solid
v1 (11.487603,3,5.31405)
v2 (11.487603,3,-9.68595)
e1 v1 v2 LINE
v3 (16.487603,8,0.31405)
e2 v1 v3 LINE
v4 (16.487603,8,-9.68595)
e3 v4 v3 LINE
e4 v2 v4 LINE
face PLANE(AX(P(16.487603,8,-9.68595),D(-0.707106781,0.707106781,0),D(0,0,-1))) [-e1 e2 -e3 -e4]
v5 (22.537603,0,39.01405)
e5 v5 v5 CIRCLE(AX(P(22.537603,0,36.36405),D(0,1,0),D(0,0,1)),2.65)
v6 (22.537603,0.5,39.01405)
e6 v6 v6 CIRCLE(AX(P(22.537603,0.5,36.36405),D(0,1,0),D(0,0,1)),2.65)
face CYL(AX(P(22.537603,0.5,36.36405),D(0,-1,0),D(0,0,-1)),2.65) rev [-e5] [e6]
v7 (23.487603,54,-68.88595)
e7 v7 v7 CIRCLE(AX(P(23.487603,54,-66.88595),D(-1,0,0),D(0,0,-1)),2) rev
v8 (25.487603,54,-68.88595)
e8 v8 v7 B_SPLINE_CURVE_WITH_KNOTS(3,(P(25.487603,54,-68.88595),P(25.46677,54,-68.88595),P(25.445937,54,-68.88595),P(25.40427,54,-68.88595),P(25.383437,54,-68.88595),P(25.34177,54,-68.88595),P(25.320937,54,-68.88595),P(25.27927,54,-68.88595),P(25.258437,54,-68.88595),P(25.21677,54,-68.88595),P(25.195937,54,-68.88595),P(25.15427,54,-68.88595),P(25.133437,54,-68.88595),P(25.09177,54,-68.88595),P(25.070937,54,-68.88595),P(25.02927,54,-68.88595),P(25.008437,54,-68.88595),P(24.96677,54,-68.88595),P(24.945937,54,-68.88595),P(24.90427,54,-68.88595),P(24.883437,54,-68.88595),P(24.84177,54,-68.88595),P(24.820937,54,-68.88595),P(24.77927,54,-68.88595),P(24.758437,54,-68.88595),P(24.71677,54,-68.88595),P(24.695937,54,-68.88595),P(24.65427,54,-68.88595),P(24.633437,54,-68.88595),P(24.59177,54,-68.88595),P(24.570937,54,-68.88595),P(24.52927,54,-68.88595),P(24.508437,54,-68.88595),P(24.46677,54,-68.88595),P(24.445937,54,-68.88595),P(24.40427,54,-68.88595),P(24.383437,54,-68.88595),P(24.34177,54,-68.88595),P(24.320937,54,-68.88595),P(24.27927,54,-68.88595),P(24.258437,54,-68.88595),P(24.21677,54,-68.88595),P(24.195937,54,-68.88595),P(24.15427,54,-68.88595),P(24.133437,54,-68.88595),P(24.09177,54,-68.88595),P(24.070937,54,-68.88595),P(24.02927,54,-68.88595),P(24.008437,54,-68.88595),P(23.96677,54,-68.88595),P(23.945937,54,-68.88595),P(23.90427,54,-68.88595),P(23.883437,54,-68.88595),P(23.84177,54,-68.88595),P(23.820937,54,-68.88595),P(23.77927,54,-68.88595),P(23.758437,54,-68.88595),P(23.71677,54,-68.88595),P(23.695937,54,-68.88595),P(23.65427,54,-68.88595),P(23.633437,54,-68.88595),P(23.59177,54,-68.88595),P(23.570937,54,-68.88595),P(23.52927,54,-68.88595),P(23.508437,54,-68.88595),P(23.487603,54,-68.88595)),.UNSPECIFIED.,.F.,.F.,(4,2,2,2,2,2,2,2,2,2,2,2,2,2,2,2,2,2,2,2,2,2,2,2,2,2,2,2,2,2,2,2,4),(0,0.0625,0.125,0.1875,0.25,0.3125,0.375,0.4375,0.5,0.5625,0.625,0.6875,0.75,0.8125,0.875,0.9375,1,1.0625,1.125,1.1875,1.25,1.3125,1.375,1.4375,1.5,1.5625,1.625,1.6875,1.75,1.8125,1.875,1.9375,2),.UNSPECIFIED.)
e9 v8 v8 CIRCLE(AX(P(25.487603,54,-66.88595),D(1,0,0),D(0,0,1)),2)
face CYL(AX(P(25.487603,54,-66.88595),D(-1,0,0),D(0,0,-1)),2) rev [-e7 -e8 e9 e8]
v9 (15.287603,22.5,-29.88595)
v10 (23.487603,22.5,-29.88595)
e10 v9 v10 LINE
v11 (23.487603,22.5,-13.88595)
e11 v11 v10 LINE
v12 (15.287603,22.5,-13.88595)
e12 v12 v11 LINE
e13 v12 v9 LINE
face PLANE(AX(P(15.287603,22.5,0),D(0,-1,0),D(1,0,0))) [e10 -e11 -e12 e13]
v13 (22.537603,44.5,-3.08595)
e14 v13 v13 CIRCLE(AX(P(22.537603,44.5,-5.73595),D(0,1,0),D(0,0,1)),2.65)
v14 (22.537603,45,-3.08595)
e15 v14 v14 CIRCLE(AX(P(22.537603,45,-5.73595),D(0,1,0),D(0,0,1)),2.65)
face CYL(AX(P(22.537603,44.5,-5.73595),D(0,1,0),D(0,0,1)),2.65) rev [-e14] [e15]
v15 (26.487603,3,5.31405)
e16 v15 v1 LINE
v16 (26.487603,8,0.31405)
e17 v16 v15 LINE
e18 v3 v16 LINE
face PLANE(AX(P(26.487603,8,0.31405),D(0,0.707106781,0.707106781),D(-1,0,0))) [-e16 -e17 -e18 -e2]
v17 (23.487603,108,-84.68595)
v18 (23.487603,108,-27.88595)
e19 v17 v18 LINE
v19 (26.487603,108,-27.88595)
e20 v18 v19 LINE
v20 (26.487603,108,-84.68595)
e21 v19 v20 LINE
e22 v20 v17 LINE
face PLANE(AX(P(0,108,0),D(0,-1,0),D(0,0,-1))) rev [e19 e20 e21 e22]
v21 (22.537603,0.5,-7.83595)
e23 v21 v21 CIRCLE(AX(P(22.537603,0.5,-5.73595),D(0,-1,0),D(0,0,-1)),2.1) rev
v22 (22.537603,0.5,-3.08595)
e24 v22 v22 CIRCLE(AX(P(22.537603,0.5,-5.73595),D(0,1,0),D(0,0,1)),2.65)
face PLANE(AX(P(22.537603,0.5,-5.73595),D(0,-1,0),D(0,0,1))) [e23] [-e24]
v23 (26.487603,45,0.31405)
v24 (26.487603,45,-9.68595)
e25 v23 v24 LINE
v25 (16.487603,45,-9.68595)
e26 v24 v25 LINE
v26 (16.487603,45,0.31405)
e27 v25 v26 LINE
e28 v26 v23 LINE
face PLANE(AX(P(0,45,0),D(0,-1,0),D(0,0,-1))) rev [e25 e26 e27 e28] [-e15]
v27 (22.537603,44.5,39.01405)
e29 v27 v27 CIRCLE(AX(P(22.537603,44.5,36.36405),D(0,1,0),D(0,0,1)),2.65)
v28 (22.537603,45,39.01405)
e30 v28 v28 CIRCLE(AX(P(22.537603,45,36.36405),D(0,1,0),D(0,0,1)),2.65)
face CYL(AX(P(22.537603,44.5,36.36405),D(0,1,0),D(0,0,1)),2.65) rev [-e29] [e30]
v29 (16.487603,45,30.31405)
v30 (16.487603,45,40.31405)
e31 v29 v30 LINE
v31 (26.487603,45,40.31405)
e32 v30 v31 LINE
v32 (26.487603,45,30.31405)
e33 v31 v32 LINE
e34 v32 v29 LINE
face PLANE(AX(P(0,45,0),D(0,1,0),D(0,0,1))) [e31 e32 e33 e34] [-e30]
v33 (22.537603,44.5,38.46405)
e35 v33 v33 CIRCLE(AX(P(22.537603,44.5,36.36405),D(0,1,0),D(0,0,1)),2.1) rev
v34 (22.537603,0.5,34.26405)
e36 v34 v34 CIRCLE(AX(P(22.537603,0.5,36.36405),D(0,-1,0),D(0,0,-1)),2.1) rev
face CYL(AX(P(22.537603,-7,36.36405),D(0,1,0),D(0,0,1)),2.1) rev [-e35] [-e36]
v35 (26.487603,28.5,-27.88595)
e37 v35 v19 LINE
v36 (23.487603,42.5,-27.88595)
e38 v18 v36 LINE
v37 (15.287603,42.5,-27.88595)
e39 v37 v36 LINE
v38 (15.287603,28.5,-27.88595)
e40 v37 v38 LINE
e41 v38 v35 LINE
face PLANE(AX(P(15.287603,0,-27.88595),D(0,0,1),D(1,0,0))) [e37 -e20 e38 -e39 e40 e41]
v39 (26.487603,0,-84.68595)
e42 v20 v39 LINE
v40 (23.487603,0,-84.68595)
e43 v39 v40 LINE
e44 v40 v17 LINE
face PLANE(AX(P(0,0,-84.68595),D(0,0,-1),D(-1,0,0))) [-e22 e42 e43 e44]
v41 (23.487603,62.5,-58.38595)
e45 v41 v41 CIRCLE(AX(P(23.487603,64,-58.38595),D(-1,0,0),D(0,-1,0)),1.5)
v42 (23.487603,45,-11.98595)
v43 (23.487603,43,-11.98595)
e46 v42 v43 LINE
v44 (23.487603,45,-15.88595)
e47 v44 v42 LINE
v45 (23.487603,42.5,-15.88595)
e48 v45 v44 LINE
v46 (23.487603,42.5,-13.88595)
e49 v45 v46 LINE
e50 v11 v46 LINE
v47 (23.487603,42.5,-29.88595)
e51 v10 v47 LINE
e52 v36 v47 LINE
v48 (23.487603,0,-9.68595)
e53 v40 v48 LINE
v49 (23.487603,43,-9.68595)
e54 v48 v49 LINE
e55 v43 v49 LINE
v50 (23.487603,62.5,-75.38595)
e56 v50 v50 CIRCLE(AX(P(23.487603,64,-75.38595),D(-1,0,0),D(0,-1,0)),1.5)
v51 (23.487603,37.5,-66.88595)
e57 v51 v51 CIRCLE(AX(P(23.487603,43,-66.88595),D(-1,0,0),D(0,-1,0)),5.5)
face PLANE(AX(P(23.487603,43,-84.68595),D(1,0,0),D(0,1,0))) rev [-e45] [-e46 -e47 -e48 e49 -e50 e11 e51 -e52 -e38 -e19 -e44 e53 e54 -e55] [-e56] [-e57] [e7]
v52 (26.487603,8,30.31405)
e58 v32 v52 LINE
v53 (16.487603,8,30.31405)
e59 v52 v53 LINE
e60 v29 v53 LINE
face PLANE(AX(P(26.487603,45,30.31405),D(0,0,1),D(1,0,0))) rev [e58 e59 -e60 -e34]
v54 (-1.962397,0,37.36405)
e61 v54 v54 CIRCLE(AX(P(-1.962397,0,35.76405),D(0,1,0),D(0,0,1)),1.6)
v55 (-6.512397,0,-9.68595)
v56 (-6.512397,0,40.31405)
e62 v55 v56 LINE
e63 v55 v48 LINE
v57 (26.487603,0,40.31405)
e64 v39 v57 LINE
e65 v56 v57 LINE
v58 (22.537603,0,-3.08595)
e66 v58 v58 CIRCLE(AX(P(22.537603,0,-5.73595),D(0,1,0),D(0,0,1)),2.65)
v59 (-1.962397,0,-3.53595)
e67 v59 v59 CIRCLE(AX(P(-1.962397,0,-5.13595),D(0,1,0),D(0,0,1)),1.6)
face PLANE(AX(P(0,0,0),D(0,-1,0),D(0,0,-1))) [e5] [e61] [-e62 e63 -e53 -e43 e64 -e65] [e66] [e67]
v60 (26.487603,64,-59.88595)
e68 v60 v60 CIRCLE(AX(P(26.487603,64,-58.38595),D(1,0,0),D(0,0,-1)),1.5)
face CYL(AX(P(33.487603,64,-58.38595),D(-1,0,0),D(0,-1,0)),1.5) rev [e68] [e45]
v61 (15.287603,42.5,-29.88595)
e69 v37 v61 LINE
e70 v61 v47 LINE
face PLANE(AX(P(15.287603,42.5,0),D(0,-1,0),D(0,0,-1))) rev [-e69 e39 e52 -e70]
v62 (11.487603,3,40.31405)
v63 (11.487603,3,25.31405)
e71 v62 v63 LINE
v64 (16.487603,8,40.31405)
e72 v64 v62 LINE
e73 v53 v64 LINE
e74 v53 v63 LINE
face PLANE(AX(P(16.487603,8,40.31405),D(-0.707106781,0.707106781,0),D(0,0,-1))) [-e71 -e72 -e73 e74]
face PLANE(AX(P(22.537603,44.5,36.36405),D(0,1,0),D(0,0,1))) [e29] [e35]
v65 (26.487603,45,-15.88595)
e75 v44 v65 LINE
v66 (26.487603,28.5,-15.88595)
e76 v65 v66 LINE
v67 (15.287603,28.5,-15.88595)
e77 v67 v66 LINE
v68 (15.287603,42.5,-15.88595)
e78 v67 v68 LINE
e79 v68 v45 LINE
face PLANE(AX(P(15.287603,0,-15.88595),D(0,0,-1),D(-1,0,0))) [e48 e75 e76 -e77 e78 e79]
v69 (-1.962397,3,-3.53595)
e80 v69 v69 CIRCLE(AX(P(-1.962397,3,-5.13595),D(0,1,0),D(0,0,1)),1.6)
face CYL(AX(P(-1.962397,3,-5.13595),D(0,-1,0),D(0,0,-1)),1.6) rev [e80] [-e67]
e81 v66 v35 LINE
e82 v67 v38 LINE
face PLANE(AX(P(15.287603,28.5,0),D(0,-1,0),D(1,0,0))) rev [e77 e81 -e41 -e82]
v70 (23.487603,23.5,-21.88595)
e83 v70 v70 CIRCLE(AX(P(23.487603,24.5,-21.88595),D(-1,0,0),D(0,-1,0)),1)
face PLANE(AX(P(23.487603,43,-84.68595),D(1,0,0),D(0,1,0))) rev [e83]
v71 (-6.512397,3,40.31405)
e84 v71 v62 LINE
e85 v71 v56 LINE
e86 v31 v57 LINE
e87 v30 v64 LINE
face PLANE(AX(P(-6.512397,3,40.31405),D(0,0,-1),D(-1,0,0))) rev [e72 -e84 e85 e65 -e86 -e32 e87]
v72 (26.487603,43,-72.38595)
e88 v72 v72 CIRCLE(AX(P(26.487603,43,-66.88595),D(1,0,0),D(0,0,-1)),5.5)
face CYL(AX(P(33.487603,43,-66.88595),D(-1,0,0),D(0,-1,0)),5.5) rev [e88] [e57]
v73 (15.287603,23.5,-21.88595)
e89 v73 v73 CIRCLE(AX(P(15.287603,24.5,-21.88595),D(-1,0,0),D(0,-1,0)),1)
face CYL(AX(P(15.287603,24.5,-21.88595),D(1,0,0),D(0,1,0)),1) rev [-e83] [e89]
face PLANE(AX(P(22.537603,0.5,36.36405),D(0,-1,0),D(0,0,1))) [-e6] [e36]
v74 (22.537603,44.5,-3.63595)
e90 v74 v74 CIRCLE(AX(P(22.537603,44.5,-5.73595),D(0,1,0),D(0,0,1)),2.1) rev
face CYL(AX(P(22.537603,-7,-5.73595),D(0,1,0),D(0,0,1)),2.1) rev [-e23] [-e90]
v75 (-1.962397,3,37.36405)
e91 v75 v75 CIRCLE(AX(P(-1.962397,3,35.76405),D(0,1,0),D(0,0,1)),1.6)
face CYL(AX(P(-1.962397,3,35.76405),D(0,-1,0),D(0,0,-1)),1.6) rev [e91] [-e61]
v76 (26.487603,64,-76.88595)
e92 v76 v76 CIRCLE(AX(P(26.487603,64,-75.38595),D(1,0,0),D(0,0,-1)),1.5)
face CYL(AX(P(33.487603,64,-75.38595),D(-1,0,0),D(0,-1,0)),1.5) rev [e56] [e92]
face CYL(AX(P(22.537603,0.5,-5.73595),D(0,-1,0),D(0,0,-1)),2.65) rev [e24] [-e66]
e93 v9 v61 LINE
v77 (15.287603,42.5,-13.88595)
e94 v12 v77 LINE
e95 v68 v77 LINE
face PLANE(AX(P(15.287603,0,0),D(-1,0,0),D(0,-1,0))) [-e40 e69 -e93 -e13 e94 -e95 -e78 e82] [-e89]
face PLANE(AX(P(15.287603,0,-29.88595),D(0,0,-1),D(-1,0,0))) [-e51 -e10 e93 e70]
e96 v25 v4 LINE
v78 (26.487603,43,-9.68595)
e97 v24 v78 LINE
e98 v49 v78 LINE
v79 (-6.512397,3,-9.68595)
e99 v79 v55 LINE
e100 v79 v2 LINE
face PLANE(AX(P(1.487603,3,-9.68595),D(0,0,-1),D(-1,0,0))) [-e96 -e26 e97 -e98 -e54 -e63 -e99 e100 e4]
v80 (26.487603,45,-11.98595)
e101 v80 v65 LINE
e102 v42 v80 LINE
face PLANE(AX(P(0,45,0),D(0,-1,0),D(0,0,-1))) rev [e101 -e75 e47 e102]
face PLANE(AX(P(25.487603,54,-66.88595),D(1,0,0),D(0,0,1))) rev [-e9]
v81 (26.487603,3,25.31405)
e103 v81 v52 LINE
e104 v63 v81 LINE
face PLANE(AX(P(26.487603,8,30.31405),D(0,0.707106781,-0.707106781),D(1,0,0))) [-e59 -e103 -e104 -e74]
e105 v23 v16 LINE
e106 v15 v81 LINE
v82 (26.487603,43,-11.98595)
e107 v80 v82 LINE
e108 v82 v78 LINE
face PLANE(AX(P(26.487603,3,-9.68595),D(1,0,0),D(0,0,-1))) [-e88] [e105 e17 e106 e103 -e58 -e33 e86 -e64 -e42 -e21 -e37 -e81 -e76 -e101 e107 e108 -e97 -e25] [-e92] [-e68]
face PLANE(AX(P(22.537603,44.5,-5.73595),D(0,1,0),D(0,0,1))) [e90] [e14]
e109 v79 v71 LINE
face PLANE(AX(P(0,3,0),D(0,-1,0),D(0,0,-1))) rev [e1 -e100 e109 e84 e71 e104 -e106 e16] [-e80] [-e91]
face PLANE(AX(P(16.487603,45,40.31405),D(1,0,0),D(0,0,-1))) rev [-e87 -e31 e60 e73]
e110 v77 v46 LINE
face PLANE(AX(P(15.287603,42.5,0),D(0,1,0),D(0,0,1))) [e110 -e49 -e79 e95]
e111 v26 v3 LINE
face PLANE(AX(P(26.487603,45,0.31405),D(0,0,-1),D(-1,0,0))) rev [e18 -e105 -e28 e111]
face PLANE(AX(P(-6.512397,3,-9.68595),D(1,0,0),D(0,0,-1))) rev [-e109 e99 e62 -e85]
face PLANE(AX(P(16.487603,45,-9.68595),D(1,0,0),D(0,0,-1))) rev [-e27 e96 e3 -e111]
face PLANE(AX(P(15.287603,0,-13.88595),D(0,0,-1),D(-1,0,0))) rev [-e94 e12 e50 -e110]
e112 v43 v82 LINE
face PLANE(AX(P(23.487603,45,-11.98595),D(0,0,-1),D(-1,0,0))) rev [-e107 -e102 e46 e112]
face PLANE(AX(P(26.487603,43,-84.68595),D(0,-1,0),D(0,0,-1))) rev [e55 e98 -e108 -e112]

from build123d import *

# Parameters (mm, degrees)
SKETCH1_R           = 1.6
BOSS_EXTRUDE1_DEPTH = 3
SKETCH2_W           = 10
SKETCH2_H           = 10
BOSS_EXTRUDE2_DEPTH = 42
CHAMFER1_SIZE       = 5
SKETCH3_R           = 2.1
CUT_EXTRUDE1_DEPTH  = 52
SKETCH4_R           = 2.65
CUT_EXTRUDE2_DEPTH  = 0.5
SKETCH5_W           = 3
SKETCH5_H           = 43
BOSS_EXTRUDE3_DEPTH = 75
SKETCH6_W           = 3
SKETCH6_H           = 72.7
BOSS_EXTRUDE4_DEPTH = 2
SKETCH7_W           = 3
SKETCH7_H           = 68.8
BOSS_EXTRUDE5_DEPTH = 3
BOSS_EXTRUDE7_DEPTH = 8.2
SKETCH9_W           = 12
SKETCH9_H           = 19.5
CUT_EXTRUDE3_DEPTH  = 8.5
SKETCH10_W          = 3
SKETCH10_H          = 56.8
BOSS_EXTRUDE8_DEPTH = 15
SKETCH13_W          = 3
SKETCH13_H          = 56.8
BOSS_EXTRUDE9_DEPTH = 45
SKETCH14_R          = 1.5
SKETCH14_R_2        = 5.5
CUT_EXTRUDE4_DEPTH  = 10
CAVITY2_START       = 23.487603306
CAVITY2_OUTLINE_R   = 2
CAVITY2_DEPTH       = 2


# Read off the part's stored shape, not the designer's step: Cavity2
with BuildPart() as part:
    # Sketch1 → Boss-Extrude1 (new body)
    with BuildSketch(Plane(origin=(0, 0, 0), x_dir=(1, 0, 0), z_dir=(0, 1, 0))):
        Polygon((-6.512396694, 9.685950413), (1.487603306, 9.685950413), (26.487603306, 9.685950413), (26.487603306, -40.314049587), (1.487603306, -40.314049587), (-6.512396694, -40.314049587), align=None)
        with Locations(Location((-1.962396694, -35.764049587, 0), (0, 0, 270))):
            Circle(SKETCH1_R, mode=Mode.SUBTRACT)
        with Locations(Location((-1.962396694, 5.135950413, 0), (0, 0, 270))):
            Circle(SKETCH1_R, mode=Mode.SUBTRACT)
    extrude(amount=BOSS_EXTRUDE1_DEPTH)

    # Sketch2 → Boss-Extrude2 (add)
    with BuildSketch(Plane(origin=(0, 3, 0), x_dir=(1, 0, 0), z_dir=(0, 1, 0))):
        with Locations((21.487603306, -35.314049587)):
            Rectangle(SKETCH2_W, SKETCH2_H)
        with Locations((21.487603306, 4.685950413)):
            Rectangle(SKETCH2_W, SKETCH2_H)
    extrude(amount=BOSS_EXTRUDE2_DEPTH)

    # Chamfer1
    chamfer1_edges = [part.edges().sort_by_distance(p)[0] for p in [
        (21.487603306, 3, 30.314049587),
        (16.487603306, 3, 35.314049587),
        (16.487603306, 3, -4.685950413),
        (21.487603306, 3, 0.314049587),
    ]]
    chamfer(chamfer1_edges, length=CHAMFER1_SIZE)

    # Sketch3 → Cut-Extrude1 (cut)
    with BuildSketch(Plane(origin=(0, 45, 0), x_dir=(1, 0, 0), z_dir=(0, 1, 0))):
        with Locations(Location((22.537603306, -36.364049587, 0), (0, 0, 270))):
            Circle(SKETCH3_R)
        with Locations(Location((22.537603306, 5.735950413, 0), (0, 0, 270))):
            Circle(SKETCH3_R)
    extrude(amount=-CUT_EXTRUDE1_DEPTH, mode=Mode.SUBTRACT)

    # Sketch4 → Cut-Extrude2 (cut)
    with BuildSketch(Plane(origin=(0, 45, 0), x_dir=(1, 0, 0), z_dir=(0, 1, 0))):
        with Locations(Location((22.537603306, -36.364049587, 0), (0, 0, 270))):
            Circle(SKETCH4_R)
        with Locations(Location((22.537603306, 5.735950413, 0), (0, 0, 270))):
            Circle(SKETCH4_R)
    cut_extrude2 = extrude(amount=-CUT_EXTRUDE2_DEPTH, mode=Mode.SUBTRACT)

    # Mirror1: Cut-Extrude2 across plane
    add(cut_extrude2.mirror(Plane(origin=(0, 22.5, 0), x_dir=(0, 0, 1), z_dir=(0, -1, 0))), mode=Mode.SUBTRACT)

    # Sketch5 → Boss-Extrude3 (add)
    with BuildSketch(Plane(origin=(0, 0, -9.685950413), x_dir=(-1, 0, 0), z_dir=(0, 0, -1))):
        with Locations((-24.987603306, 21.5)):
            Rectangle(SKETCH5_W, SKETCH5_H)
    extrude(amount=BOSS_EXTRUDE3_DEPTH)

    # Sketch6 → Boss-Extrude4 (add)
    with BuildSketch(Plane(origin=(0, 43, 0), x_dir=(1, 0, 0), z_dir=(0, 1, 0))):
        with Locations((24.987603306, 48.335950413)):
            Rectangle(SKETCH6_W, SKETCH6_H)
    extrude(amount=BOSS_EXTRUDE4_DEPTH)

    # Sketch7 → Boss-Extrude5 (add)
    with BuildSketch(Plane(origin=(0, 45, 0), x_dir=(1, 0, 0), z_dir=(0, 1, 0))):
        with Locations((24.987603306, 50.285950413)):
            Rectangle(SKETCH7_W, SKETCH7_H)
    extrude(amount=BOSS_EXTRUDE5_DEPTH)

    # Sketch8 → Boss-Extrude7 (add)
    with BuildSketch(Plane.ZY.offset(-23.487603306)):
        Polygon((-27.885950413, 24.5), (-27.885950413, 28.5), (-27.885950413, 42.5), (-29.885950413, 42.5), (-29.885950413, 22.5), (-27.885950413, 22.5), align=None)
        with BuildLine():
            Line((-15.885950413, 24.5), (-15.885950413, 28.5))
            Line((-15.885950413, 28.5), (-27.885950413, 28.5))
            Line((-27.885950413, 28.5), (-27.885950413, 24.5))
            Line((-27.885950413, 24.5), (-22.885950413, 24.5))
            ThreePointArc((-22.885950413, 24.5), (-21.885950413, 25.5), (-20.885950413, 24.5))
            Line((-20.885950413, 24.5), (-15.885950413, 24.5))
        make_face()
        with BuildLine():
            Line((-15.885950413, 22.5), (-15.885950413, 24.5))
            Line((-15.885950413, 24.5), (-20.885950413, 24.5))
            ThreePointArc((-20.885950413, 24.5), (-21.885950413, 23.5), (-22.885950413, 24.5))
            Line((-22.885950413, 24.5), (-27.885950413, 24.5))
            Line((-27.885950413, 24.5), (-27.885950413, 22.5))
            Line((-27.885950413, 22.5), (-15.885950413, 22.5))
        make_face()
        Polygon((-15.885950413, 42.5), (-15.885950413, 28.5), (-15.885950413, 24.5), (-15.885950413, 22.5), (-13.885950413, 22.5), (-13.885950413, 42.5), align=None)
    extrude(amount=BOSS_EXTRUDE7_DEPTH)

    # Sketch9 → Cut-Extrude3 (cut)
    with BuildSketch(Plane.ZY.offset(-23.487603306)):
        with Locations((-21.885950413, 38.25)):
            Rectangle(SKETCH9_W, SKETCH9_H)
    extrude(amount=-CUT_EXTRUDE3_DEPTH, mode=Mode.SUBTRACT)

    # Sketch10 → Boss-Extrude8 (add)
    with BuildSketch(Plane(origin=(0, 48, 0), x_dir=(1, 0, 0), z_dir=(0, 1, 0))):
        with Locations((24.987603306, 56.285950413)):
            Rectangle(SKETCH10_W, SKETCH10_H)
    extrude(amount=BOSS_EXTRUDE8_DEPTH)

    # Sketch13 → Boss-Extrude9 (add)
    with BuildSketch(Plane(origin=(0, 63, 0), x_dir=(1, 0, 0), z_dir=(0, 1, 0))):
        with Locations((24.987603306, 56.285950413)):
            Rectangle(SKETCH13_W, SKETCH13_H)
    extrude(amount=BOSS_EXTRUDE9_DEPTH)

    # Sketch14 → Cut-Extrude4 (cut)
    with BuildSketch(Plane.ZY.offset(-23.487603306)):
        with Locations(Location((-58.385950413, 64, 0), (0, 0, 270))):
            Circle(SKETCH14_R)
        with Locations(Location((-75.385950413, 64, 0), (0, 0, 270))):
            Circle(SKETCH14_R)
        with Locations(Location((-66.885950413, 43, 0), (0, 0, 270))):
            Circle(SKETCH14_R_2)
    extrude(amount=-CUT_EXTRUDE4_DEPTH, mode=Mode.SUBTRACT)

    # Cavity2 outline → Cavity2 (cut)
    with BuildSketch(Plane.YZ.offset(CAVITY2_START)):
        with Locations((54, -66.885950413)):
            Circle(CAVITY2_OUTLINE_R)
    extrude(amount=CAVITY2_DEPTH, mode=Mode.SUBTRACT)


solid = part.part
